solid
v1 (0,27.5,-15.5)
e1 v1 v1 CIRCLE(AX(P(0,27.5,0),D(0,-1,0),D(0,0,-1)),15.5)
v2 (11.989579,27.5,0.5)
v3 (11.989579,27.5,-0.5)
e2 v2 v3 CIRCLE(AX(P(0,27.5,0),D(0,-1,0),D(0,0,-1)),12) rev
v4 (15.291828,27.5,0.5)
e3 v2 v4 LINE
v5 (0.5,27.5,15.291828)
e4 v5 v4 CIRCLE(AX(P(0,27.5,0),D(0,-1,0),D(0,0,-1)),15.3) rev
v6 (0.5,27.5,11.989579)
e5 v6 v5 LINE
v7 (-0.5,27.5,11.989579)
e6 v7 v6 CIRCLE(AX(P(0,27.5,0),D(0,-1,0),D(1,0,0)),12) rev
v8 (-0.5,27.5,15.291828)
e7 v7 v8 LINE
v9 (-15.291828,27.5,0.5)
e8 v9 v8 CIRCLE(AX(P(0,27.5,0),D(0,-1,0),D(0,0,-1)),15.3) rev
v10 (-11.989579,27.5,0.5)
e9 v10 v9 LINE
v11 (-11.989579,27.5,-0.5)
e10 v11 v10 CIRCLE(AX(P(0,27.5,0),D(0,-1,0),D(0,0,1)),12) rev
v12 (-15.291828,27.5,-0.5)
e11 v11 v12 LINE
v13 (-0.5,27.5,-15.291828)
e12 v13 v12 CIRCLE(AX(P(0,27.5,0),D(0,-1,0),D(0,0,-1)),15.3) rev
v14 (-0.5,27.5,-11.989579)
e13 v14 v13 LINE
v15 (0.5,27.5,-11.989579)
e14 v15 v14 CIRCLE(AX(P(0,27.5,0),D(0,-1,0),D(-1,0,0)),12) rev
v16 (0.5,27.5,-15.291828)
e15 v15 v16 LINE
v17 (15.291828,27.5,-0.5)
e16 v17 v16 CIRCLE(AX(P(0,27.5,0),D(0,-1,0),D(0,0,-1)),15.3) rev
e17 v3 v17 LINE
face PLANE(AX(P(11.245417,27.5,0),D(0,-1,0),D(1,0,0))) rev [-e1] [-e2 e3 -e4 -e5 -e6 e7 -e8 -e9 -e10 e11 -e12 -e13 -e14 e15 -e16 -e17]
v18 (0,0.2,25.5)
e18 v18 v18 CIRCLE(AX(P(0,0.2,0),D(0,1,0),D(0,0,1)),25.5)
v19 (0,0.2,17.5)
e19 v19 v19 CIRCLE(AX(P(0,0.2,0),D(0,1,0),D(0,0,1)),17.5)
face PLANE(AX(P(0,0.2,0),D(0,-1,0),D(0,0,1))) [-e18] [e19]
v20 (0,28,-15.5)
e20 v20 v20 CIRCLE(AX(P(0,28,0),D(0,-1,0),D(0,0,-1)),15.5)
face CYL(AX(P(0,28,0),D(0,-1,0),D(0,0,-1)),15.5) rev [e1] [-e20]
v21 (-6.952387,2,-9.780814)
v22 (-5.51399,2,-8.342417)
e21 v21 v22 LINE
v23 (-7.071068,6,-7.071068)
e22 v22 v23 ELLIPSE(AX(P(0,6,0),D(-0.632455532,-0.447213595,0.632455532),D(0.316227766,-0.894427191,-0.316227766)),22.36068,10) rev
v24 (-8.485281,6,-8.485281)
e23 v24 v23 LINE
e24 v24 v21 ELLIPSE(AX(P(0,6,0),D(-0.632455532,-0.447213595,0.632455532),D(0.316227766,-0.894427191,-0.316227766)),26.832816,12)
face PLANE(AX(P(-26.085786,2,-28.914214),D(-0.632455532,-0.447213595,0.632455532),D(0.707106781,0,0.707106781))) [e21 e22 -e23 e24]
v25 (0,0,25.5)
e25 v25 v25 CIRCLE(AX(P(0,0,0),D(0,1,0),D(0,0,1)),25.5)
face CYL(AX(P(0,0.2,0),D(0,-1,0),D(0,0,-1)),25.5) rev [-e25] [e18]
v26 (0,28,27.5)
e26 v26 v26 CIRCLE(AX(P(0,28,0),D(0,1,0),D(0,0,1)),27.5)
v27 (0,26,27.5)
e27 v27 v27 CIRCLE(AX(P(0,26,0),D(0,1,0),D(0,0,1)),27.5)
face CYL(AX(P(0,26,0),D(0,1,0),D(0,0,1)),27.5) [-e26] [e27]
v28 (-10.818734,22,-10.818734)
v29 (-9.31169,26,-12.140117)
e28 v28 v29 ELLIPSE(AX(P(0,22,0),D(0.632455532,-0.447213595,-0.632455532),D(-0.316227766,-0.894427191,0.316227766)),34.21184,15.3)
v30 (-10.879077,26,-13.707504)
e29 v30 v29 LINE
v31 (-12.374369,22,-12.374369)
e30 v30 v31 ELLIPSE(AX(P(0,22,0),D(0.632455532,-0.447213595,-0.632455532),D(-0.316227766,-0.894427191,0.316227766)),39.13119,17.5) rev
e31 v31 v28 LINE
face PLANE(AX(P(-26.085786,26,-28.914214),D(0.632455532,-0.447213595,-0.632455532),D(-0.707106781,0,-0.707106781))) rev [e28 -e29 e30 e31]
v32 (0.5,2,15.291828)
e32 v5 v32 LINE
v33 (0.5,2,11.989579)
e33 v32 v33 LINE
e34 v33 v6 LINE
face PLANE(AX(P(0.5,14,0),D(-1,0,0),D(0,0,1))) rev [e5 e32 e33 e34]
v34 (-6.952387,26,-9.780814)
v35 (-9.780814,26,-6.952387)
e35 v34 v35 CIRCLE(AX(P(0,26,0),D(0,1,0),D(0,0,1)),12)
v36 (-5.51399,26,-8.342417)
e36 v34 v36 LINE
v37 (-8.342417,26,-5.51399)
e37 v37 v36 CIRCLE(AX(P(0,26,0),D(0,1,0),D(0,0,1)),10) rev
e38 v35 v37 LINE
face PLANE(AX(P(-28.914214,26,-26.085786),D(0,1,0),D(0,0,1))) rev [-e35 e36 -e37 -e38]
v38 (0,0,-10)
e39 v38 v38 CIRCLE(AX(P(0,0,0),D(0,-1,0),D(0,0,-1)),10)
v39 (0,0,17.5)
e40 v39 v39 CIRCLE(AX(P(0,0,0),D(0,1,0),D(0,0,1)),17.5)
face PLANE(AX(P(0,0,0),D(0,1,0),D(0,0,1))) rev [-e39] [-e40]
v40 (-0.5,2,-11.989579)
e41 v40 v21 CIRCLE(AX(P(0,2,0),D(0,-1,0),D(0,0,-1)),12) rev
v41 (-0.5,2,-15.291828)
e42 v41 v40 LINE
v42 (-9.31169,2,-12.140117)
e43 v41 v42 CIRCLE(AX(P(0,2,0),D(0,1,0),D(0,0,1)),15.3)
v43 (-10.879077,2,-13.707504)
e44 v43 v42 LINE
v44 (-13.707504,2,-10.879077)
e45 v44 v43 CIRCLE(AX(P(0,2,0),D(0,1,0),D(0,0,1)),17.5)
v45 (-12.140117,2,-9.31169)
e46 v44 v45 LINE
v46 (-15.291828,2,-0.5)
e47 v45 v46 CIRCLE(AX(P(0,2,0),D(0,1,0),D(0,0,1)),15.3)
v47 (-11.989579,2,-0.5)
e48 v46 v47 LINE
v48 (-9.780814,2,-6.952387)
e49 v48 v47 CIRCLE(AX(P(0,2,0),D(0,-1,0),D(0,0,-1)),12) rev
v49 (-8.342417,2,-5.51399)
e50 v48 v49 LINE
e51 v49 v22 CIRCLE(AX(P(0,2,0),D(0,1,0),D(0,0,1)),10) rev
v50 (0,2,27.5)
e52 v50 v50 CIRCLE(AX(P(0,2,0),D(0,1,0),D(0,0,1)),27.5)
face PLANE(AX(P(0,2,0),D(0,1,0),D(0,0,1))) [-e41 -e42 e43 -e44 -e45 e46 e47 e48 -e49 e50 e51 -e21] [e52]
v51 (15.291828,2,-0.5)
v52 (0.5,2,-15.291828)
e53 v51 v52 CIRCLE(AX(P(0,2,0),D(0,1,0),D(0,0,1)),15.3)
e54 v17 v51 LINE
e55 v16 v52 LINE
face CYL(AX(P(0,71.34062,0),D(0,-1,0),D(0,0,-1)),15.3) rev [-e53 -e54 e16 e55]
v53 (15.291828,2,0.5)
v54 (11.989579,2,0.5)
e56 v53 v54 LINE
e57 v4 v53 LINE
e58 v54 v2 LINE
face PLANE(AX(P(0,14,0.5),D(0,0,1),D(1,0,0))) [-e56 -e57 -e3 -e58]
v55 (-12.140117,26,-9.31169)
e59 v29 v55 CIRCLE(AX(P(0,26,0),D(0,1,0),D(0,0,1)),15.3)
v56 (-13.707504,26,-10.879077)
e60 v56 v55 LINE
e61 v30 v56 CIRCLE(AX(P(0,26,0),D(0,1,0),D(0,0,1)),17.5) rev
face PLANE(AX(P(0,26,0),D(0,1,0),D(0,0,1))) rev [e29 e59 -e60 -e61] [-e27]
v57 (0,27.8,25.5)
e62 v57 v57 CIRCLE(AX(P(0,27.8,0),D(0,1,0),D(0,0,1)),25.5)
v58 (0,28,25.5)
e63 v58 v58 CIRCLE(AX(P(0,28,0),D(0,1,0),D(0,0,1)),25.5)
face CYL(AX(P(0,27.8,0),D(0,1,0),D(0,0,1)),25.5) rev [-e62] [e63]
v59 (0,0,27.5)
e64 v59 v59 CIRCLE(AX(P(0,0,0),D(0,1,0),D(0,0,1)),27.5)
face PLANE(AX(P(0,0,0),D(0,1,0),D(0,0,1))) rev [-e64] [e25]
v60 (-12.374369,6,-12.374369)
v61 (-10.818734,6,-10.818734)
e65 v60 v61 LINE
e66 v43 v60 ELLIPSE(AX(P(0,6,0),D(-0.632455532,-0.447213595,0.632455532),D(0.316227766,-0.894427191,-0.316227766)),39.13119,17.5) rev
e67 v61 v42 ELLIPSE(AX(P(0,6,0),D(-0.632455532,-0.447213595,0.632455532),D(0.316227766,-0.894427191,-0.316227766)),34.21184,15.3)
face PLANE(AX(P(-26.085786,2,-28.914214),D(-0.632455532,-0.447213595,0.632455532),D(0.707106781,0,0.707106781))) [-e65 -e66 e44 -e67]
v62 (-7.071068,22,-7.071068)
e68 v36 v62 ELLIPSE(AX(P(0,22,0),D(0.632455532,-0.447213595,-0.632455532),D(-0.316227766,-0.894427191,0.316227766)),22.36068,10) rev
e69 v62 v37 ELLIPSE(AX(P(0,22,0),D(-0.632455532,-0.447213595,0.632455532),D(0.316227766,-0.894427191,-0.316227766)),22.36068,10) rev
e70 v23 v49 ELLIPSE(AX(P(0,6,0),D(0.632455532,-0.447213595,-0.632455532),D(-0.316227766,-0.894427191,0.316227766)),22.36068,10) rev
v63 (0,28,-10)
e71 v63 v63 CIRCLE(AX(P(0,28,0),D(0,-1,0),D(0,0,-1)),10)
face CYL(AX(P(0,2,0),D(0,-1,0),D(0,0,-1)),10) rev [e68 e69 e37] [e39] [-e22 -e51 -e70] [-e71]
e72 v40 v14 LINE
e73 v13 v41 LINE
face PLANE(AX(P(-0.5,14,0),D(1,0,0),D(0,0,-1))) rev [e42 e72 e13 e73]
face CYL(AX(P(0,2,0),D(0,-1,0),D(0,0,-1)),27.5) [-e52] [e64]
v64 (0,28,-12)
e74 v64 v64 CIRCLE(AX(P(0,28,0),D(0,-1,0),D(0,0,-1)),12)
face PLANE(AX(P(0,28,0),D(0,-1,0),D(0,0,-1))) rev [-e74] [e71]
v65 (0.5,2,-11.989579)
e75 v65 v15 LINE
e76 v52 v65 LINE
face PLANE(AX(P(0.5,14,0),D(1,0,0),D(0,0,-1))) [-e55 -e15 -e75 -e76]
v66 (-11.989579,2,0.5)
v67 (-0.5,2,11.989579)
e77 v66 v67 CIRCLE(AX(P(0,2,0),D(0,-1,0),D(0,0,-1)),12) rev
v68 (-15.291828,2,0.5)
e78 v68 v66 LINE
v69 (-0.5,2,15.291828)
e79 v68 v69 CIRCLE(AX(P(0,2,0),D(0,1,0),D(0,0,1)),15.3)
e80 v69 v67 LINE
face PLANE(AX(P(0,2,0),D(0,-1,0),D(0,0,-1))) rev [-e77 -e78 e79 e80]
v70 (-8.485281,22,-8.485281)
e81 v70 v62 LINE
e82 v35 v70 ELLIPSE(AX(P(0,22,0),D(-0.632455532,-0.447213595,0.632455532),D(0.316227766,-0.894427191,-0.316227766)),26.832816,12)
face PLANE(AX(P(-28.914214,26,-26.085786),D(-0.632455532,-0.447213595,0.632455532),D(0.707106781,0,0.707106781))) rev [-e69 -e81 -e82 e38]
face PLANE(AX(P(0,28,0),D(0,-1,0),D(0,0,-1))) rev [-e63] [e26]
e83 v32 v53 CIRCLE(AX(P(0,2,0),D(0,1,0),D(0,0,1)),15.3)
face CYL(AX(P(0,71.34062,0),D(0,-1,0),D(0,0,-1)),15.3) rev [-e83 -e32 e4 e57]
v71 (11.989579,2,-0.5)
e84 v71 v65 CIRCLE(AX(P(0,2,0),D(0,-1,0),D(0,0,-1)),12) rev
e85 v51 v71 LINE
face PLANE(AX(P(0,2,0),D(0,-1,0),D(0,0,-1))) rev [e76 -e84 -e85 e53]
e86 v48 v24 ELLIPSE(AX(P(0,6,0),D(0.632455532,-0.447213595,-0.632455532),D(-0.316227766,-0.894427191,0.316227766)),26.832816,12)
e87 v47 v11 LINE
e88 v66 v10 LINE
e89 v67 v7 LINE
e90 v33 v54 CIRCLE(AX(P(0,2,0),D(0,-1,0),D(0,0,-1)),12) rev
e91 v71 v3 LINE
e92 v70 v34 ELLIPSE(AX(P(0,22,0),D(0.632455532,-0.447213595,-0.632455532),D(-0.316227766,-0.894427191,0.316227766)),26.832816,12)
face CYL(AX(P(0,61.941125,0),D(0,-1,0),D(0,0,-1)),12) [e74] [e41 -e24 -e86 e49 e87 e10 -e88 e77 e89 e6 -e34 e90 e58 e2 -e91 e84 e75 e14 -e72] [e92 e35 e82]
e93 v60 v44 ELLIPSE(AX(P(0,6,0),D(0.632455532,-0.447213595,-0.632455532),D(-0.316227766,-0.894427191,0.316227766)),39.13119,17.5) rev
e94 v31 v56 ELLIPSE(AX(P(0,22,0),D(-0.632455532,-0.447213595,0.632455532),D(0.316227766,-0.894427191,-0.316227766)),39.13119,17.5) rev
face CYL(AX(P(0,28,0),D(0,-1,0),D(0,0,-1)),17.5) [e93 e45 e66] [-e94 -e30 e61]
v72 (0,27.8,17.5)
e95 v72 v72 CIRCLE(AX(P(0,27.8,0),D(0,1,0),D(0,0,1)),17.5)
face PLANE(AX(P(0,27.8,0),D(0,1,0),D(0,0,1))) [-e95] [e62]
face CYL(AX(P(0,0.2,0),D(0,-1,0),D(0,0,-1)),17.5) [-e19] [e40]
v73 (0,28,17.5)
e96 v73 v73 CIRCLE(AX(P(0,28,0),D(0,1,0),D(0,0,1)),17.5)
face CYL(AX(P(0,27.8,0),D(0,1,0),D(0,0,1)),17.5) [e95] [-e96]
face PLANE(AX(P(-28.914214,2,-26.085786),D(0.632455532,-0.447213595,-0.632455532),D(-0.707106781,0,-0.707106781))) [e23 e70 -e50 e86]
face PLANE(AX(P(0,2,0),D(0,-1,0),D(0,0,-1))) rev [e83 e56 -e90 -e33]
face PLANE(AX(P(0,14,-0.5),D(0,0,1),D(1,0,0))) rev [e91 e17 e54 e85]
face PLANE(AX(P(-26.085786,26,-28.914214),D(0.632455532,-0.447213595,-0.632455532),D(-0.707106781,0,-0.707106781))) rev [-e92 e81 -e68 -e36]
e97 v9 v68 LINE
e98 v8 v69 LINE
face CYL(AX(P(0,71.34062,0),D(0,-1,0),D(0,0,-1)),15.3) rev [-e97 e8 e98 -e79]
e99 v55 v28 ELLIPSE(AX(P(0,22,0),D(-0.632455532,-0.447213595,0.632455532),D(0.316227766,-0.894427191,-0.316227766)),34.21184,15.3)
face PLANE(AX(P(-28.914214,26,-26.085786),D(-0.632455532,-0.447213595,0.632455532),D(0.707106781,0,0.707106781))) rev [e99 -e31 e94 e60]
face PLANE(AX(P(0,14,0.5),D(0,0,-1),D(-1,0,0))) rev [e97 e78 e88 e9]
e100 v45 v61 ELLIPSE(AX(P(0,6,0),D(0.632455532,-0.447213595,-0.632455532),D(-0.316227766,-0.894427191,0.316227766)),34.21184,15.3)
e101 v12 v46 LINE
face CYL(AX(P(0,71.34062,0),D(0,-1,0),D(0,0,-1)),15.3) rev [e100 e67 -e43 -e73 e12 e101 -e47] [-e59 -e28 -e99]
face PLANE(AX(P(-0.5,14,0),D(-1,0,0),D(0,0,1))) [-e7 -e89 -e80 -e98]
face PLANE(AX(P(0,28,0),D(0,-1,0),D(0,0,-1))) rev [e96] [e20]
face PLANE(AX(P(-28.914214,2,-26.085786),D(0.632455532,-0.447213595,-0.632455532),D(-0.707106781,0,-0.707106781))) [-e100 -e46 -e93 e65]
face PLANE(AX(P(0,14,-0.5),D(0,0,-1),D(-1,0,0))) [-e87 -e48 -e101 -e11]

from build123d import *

# Parameters (mm, degrees)
SKETCH_1_R               = 27.5
EXTRUDE_1_DEPTH          = 2
SKETCH_2_R               = 17.5
EXTRUDE_4_DEPTH          = 28
EXTRUDE_START            = -2
SKETCH_4_R               = 27.5
EXTRUDE_5_DEPTH          = 2
SHELL_1_OUTLINE_R        = 15.5
SHELL_1_DEPTH            = 28
SKETCH_5_R               = 27.5
SKETCH_5_R_2             = 10
EXTRUDE_6_DEPTH          = 2
SKETCH_6_R               = 12
SKETCH_6_R_2             = 10
EXTRUDE_7_DEPTH          = 26
RIB_START                = -0.5
RIB_1_OUTLINE_W          = 7
RIB_1_OUTLINE_H          = 25.5
RIB_1_DEPTH              = 1
PATTERN_CIRCULAR_1_COUNT = 4
SKETCH_9_R               = 15.5
SKETCH_9_R_2             = 15.3
EXTRUDE_8_DEPTH          = 25.5
CUT_EXTRUDE_2_DEPTH      = 48.921811318
CUT_EXTRUDE_START        = -0.2
SKETCH_10_R              = 25.5
SKETCH_10_R_2            = 17.5
CUT_EXTRUDE_3_DEPTH      = 0.2


# Read off the part's stored shape, not the designer's step: 抽壳1, 筋1
with BuildPart() as part:
    # 草图1 → 凸台-拉伸1 (new body)
    with BuildSketch(Plane(origin=(0, 0, 0), x_dir=(1, 0, 0), z_dir=(0, 1, 0))):
        with Locations(Location((0, 0, 0), (0, 0, 270))):
            Circle(SKETCH_1_R)
    extrude(amount=EXTRUDE_1_DEPTH)

    # 草图2 → 凸台-拉伸4 (add)
    with BuildSketch(Plane.XZ):
        with Locations(Location((0, 0, 0), (0, 0, 270))):
            Circle(SKETCH_2_R)
    extrude(amount=-EXTRUDE_4_DEPTH)

    # 草图4 → 凸台-拉伸5 (add)
    with BuildSketch(Plane(origin=(0, 28, 0), x_dir=(1, 0, 0), z_dir=(0, 1, 0)).offset(EXTRUDE_START)):
        with Locations(Location((0, 0, 0), (0, 0, 270))):
            Circle(SKETCH_4_R)
    extrude(amount=EXTRUDE_5_DEPTH)

    # 抽壳1 outline → 抽壳1 (cut)
    with BuildSketch(Plane(origin=(0, 0, 0), x_dir=(1, 0, 0), z_dir=(0, 1, 0))):
        Circle(SHELL_1_OUTLINE_R)
    extrude(amount=SHELL_1_DEPTH, mode=Mode.SUBTRACT)

    # 草图5 → 凸台-拉伸6 (add)
    with BuildSketch(Plane.XZ):
        with Locations(Location((0, 0, 0), (0, 0, 90))):
            Circle(SKETCH_5_R)
        with Locations(Location((0, 0, 0), (0, 0, 270))):
            Circle(SKETCH_5_R_2, mode=Mode.SUBTRACT)
    extrude(amount=-EXTRUDE_6_DEPTH)

    # 草图6 → 凸台-拉伸7 (add)
    with BuildSketch(Plane(origin=(0, 2, 0), x_dir=(1, 0, 0), z_dir=(0, 1, 0))):
        with Locations(Location((0, 0, 0), (0, 0, 90))):
            Circle(SKETCH_6_R)
        with Locations(Location((0, 0, 0), (0, 0, 90))):
            Circle(SKETCH_6_R_2, mode=Mode.SUBTRACT)
    extrude(amount=EXTRUDE_7_DEPTH)

    # 筋1 outline → 筋1 (add)
    with BuildSketch(Plane.XY.offset(RIB_START)):
        with Locations((13.5, 14.75)):
            Rectangle(RIB_1_OUTLINE_W, RIB_1_OUTLINE_H)
    rib_1 = extrude(amount=RIB_1_DEPTH)

    # 阵列(圆周)1: 筋1 ×4 about axis
    pattern_circular_1_axis = Axis((0, 0, 0), (0, 1, 0))
    for i in range(1, PATTERN_CIRCULAR_1_COUNT):
        add(rib_1.rotate(pattern_circular_1_axis, i * 360 / PATTERN_CIRCULAR_1_COUNT))

    # 草图9 → 凸台-拉伸8 (add)
    with BuildSketch(Plane(origin=(0, 2, 0), x_dir=(1, 0, 0), z_dir=(0, 1, 0))):
        with Locations(Location((0, 0, 0), (0, 0, 90))):
            Circle(SKETCH_9_R)
        Circle(SKETCH_9_R_2, mode=Mode.SUBTRACT)
    extrude(amount=EXTRUDE_8_DEPTH)

    # 草图8 → 切除-拉伸2 (cut, through all)
    with BuildSketch(Plane(origin=(0, 0, 0), x_dir=(0, 1, 0), z_dir=(0.7071067811865488, 0, 0.7071067811865464))):
        Polygon((26, 2), (26, -2), (22, 0), align=None)
    cut_extrude_2 = extrude(amount=-CUT_EXTRUDE_2_DEPTH, mode=Mode.SUBTRACT)

    # 镜向2: 切除-拉伸2 across plane
    add(cut_extrude_2.mirror(Plane.ZX.offset(14)), mode=Mode.SUBTRACT)

    # 草图10 → 切除-拉伸3 (cut)
    with BuildSketch(Plane(origin=(0, 28, 0), x_dir=(1, 0, 0), z_dir=(0, 1, 0)).offset(CUT_EXTRUDE_START)):
        with Locations(Location((0, 0, 0), (0, 0, 270))):
            Circle(SKETCH_10_R)
        with Locations(Location((0, 0, 0), (0, 0, 128.437572131))):
            Circle(SKETCH_10_R_2, mode=Mode.SUBTRACT)
    cut_extrude_3 = extrude(amount=CUT_EXTRUDE_3_DEPTH, mode=Mode.SUBTRACT)

    # 镜向3: 切除-拉伸3 across plane
    add(cut_extrude_3.mirror(Plane.ZX.offset(14)), mode=Mode.SUBTRACT)


solid = part.part
